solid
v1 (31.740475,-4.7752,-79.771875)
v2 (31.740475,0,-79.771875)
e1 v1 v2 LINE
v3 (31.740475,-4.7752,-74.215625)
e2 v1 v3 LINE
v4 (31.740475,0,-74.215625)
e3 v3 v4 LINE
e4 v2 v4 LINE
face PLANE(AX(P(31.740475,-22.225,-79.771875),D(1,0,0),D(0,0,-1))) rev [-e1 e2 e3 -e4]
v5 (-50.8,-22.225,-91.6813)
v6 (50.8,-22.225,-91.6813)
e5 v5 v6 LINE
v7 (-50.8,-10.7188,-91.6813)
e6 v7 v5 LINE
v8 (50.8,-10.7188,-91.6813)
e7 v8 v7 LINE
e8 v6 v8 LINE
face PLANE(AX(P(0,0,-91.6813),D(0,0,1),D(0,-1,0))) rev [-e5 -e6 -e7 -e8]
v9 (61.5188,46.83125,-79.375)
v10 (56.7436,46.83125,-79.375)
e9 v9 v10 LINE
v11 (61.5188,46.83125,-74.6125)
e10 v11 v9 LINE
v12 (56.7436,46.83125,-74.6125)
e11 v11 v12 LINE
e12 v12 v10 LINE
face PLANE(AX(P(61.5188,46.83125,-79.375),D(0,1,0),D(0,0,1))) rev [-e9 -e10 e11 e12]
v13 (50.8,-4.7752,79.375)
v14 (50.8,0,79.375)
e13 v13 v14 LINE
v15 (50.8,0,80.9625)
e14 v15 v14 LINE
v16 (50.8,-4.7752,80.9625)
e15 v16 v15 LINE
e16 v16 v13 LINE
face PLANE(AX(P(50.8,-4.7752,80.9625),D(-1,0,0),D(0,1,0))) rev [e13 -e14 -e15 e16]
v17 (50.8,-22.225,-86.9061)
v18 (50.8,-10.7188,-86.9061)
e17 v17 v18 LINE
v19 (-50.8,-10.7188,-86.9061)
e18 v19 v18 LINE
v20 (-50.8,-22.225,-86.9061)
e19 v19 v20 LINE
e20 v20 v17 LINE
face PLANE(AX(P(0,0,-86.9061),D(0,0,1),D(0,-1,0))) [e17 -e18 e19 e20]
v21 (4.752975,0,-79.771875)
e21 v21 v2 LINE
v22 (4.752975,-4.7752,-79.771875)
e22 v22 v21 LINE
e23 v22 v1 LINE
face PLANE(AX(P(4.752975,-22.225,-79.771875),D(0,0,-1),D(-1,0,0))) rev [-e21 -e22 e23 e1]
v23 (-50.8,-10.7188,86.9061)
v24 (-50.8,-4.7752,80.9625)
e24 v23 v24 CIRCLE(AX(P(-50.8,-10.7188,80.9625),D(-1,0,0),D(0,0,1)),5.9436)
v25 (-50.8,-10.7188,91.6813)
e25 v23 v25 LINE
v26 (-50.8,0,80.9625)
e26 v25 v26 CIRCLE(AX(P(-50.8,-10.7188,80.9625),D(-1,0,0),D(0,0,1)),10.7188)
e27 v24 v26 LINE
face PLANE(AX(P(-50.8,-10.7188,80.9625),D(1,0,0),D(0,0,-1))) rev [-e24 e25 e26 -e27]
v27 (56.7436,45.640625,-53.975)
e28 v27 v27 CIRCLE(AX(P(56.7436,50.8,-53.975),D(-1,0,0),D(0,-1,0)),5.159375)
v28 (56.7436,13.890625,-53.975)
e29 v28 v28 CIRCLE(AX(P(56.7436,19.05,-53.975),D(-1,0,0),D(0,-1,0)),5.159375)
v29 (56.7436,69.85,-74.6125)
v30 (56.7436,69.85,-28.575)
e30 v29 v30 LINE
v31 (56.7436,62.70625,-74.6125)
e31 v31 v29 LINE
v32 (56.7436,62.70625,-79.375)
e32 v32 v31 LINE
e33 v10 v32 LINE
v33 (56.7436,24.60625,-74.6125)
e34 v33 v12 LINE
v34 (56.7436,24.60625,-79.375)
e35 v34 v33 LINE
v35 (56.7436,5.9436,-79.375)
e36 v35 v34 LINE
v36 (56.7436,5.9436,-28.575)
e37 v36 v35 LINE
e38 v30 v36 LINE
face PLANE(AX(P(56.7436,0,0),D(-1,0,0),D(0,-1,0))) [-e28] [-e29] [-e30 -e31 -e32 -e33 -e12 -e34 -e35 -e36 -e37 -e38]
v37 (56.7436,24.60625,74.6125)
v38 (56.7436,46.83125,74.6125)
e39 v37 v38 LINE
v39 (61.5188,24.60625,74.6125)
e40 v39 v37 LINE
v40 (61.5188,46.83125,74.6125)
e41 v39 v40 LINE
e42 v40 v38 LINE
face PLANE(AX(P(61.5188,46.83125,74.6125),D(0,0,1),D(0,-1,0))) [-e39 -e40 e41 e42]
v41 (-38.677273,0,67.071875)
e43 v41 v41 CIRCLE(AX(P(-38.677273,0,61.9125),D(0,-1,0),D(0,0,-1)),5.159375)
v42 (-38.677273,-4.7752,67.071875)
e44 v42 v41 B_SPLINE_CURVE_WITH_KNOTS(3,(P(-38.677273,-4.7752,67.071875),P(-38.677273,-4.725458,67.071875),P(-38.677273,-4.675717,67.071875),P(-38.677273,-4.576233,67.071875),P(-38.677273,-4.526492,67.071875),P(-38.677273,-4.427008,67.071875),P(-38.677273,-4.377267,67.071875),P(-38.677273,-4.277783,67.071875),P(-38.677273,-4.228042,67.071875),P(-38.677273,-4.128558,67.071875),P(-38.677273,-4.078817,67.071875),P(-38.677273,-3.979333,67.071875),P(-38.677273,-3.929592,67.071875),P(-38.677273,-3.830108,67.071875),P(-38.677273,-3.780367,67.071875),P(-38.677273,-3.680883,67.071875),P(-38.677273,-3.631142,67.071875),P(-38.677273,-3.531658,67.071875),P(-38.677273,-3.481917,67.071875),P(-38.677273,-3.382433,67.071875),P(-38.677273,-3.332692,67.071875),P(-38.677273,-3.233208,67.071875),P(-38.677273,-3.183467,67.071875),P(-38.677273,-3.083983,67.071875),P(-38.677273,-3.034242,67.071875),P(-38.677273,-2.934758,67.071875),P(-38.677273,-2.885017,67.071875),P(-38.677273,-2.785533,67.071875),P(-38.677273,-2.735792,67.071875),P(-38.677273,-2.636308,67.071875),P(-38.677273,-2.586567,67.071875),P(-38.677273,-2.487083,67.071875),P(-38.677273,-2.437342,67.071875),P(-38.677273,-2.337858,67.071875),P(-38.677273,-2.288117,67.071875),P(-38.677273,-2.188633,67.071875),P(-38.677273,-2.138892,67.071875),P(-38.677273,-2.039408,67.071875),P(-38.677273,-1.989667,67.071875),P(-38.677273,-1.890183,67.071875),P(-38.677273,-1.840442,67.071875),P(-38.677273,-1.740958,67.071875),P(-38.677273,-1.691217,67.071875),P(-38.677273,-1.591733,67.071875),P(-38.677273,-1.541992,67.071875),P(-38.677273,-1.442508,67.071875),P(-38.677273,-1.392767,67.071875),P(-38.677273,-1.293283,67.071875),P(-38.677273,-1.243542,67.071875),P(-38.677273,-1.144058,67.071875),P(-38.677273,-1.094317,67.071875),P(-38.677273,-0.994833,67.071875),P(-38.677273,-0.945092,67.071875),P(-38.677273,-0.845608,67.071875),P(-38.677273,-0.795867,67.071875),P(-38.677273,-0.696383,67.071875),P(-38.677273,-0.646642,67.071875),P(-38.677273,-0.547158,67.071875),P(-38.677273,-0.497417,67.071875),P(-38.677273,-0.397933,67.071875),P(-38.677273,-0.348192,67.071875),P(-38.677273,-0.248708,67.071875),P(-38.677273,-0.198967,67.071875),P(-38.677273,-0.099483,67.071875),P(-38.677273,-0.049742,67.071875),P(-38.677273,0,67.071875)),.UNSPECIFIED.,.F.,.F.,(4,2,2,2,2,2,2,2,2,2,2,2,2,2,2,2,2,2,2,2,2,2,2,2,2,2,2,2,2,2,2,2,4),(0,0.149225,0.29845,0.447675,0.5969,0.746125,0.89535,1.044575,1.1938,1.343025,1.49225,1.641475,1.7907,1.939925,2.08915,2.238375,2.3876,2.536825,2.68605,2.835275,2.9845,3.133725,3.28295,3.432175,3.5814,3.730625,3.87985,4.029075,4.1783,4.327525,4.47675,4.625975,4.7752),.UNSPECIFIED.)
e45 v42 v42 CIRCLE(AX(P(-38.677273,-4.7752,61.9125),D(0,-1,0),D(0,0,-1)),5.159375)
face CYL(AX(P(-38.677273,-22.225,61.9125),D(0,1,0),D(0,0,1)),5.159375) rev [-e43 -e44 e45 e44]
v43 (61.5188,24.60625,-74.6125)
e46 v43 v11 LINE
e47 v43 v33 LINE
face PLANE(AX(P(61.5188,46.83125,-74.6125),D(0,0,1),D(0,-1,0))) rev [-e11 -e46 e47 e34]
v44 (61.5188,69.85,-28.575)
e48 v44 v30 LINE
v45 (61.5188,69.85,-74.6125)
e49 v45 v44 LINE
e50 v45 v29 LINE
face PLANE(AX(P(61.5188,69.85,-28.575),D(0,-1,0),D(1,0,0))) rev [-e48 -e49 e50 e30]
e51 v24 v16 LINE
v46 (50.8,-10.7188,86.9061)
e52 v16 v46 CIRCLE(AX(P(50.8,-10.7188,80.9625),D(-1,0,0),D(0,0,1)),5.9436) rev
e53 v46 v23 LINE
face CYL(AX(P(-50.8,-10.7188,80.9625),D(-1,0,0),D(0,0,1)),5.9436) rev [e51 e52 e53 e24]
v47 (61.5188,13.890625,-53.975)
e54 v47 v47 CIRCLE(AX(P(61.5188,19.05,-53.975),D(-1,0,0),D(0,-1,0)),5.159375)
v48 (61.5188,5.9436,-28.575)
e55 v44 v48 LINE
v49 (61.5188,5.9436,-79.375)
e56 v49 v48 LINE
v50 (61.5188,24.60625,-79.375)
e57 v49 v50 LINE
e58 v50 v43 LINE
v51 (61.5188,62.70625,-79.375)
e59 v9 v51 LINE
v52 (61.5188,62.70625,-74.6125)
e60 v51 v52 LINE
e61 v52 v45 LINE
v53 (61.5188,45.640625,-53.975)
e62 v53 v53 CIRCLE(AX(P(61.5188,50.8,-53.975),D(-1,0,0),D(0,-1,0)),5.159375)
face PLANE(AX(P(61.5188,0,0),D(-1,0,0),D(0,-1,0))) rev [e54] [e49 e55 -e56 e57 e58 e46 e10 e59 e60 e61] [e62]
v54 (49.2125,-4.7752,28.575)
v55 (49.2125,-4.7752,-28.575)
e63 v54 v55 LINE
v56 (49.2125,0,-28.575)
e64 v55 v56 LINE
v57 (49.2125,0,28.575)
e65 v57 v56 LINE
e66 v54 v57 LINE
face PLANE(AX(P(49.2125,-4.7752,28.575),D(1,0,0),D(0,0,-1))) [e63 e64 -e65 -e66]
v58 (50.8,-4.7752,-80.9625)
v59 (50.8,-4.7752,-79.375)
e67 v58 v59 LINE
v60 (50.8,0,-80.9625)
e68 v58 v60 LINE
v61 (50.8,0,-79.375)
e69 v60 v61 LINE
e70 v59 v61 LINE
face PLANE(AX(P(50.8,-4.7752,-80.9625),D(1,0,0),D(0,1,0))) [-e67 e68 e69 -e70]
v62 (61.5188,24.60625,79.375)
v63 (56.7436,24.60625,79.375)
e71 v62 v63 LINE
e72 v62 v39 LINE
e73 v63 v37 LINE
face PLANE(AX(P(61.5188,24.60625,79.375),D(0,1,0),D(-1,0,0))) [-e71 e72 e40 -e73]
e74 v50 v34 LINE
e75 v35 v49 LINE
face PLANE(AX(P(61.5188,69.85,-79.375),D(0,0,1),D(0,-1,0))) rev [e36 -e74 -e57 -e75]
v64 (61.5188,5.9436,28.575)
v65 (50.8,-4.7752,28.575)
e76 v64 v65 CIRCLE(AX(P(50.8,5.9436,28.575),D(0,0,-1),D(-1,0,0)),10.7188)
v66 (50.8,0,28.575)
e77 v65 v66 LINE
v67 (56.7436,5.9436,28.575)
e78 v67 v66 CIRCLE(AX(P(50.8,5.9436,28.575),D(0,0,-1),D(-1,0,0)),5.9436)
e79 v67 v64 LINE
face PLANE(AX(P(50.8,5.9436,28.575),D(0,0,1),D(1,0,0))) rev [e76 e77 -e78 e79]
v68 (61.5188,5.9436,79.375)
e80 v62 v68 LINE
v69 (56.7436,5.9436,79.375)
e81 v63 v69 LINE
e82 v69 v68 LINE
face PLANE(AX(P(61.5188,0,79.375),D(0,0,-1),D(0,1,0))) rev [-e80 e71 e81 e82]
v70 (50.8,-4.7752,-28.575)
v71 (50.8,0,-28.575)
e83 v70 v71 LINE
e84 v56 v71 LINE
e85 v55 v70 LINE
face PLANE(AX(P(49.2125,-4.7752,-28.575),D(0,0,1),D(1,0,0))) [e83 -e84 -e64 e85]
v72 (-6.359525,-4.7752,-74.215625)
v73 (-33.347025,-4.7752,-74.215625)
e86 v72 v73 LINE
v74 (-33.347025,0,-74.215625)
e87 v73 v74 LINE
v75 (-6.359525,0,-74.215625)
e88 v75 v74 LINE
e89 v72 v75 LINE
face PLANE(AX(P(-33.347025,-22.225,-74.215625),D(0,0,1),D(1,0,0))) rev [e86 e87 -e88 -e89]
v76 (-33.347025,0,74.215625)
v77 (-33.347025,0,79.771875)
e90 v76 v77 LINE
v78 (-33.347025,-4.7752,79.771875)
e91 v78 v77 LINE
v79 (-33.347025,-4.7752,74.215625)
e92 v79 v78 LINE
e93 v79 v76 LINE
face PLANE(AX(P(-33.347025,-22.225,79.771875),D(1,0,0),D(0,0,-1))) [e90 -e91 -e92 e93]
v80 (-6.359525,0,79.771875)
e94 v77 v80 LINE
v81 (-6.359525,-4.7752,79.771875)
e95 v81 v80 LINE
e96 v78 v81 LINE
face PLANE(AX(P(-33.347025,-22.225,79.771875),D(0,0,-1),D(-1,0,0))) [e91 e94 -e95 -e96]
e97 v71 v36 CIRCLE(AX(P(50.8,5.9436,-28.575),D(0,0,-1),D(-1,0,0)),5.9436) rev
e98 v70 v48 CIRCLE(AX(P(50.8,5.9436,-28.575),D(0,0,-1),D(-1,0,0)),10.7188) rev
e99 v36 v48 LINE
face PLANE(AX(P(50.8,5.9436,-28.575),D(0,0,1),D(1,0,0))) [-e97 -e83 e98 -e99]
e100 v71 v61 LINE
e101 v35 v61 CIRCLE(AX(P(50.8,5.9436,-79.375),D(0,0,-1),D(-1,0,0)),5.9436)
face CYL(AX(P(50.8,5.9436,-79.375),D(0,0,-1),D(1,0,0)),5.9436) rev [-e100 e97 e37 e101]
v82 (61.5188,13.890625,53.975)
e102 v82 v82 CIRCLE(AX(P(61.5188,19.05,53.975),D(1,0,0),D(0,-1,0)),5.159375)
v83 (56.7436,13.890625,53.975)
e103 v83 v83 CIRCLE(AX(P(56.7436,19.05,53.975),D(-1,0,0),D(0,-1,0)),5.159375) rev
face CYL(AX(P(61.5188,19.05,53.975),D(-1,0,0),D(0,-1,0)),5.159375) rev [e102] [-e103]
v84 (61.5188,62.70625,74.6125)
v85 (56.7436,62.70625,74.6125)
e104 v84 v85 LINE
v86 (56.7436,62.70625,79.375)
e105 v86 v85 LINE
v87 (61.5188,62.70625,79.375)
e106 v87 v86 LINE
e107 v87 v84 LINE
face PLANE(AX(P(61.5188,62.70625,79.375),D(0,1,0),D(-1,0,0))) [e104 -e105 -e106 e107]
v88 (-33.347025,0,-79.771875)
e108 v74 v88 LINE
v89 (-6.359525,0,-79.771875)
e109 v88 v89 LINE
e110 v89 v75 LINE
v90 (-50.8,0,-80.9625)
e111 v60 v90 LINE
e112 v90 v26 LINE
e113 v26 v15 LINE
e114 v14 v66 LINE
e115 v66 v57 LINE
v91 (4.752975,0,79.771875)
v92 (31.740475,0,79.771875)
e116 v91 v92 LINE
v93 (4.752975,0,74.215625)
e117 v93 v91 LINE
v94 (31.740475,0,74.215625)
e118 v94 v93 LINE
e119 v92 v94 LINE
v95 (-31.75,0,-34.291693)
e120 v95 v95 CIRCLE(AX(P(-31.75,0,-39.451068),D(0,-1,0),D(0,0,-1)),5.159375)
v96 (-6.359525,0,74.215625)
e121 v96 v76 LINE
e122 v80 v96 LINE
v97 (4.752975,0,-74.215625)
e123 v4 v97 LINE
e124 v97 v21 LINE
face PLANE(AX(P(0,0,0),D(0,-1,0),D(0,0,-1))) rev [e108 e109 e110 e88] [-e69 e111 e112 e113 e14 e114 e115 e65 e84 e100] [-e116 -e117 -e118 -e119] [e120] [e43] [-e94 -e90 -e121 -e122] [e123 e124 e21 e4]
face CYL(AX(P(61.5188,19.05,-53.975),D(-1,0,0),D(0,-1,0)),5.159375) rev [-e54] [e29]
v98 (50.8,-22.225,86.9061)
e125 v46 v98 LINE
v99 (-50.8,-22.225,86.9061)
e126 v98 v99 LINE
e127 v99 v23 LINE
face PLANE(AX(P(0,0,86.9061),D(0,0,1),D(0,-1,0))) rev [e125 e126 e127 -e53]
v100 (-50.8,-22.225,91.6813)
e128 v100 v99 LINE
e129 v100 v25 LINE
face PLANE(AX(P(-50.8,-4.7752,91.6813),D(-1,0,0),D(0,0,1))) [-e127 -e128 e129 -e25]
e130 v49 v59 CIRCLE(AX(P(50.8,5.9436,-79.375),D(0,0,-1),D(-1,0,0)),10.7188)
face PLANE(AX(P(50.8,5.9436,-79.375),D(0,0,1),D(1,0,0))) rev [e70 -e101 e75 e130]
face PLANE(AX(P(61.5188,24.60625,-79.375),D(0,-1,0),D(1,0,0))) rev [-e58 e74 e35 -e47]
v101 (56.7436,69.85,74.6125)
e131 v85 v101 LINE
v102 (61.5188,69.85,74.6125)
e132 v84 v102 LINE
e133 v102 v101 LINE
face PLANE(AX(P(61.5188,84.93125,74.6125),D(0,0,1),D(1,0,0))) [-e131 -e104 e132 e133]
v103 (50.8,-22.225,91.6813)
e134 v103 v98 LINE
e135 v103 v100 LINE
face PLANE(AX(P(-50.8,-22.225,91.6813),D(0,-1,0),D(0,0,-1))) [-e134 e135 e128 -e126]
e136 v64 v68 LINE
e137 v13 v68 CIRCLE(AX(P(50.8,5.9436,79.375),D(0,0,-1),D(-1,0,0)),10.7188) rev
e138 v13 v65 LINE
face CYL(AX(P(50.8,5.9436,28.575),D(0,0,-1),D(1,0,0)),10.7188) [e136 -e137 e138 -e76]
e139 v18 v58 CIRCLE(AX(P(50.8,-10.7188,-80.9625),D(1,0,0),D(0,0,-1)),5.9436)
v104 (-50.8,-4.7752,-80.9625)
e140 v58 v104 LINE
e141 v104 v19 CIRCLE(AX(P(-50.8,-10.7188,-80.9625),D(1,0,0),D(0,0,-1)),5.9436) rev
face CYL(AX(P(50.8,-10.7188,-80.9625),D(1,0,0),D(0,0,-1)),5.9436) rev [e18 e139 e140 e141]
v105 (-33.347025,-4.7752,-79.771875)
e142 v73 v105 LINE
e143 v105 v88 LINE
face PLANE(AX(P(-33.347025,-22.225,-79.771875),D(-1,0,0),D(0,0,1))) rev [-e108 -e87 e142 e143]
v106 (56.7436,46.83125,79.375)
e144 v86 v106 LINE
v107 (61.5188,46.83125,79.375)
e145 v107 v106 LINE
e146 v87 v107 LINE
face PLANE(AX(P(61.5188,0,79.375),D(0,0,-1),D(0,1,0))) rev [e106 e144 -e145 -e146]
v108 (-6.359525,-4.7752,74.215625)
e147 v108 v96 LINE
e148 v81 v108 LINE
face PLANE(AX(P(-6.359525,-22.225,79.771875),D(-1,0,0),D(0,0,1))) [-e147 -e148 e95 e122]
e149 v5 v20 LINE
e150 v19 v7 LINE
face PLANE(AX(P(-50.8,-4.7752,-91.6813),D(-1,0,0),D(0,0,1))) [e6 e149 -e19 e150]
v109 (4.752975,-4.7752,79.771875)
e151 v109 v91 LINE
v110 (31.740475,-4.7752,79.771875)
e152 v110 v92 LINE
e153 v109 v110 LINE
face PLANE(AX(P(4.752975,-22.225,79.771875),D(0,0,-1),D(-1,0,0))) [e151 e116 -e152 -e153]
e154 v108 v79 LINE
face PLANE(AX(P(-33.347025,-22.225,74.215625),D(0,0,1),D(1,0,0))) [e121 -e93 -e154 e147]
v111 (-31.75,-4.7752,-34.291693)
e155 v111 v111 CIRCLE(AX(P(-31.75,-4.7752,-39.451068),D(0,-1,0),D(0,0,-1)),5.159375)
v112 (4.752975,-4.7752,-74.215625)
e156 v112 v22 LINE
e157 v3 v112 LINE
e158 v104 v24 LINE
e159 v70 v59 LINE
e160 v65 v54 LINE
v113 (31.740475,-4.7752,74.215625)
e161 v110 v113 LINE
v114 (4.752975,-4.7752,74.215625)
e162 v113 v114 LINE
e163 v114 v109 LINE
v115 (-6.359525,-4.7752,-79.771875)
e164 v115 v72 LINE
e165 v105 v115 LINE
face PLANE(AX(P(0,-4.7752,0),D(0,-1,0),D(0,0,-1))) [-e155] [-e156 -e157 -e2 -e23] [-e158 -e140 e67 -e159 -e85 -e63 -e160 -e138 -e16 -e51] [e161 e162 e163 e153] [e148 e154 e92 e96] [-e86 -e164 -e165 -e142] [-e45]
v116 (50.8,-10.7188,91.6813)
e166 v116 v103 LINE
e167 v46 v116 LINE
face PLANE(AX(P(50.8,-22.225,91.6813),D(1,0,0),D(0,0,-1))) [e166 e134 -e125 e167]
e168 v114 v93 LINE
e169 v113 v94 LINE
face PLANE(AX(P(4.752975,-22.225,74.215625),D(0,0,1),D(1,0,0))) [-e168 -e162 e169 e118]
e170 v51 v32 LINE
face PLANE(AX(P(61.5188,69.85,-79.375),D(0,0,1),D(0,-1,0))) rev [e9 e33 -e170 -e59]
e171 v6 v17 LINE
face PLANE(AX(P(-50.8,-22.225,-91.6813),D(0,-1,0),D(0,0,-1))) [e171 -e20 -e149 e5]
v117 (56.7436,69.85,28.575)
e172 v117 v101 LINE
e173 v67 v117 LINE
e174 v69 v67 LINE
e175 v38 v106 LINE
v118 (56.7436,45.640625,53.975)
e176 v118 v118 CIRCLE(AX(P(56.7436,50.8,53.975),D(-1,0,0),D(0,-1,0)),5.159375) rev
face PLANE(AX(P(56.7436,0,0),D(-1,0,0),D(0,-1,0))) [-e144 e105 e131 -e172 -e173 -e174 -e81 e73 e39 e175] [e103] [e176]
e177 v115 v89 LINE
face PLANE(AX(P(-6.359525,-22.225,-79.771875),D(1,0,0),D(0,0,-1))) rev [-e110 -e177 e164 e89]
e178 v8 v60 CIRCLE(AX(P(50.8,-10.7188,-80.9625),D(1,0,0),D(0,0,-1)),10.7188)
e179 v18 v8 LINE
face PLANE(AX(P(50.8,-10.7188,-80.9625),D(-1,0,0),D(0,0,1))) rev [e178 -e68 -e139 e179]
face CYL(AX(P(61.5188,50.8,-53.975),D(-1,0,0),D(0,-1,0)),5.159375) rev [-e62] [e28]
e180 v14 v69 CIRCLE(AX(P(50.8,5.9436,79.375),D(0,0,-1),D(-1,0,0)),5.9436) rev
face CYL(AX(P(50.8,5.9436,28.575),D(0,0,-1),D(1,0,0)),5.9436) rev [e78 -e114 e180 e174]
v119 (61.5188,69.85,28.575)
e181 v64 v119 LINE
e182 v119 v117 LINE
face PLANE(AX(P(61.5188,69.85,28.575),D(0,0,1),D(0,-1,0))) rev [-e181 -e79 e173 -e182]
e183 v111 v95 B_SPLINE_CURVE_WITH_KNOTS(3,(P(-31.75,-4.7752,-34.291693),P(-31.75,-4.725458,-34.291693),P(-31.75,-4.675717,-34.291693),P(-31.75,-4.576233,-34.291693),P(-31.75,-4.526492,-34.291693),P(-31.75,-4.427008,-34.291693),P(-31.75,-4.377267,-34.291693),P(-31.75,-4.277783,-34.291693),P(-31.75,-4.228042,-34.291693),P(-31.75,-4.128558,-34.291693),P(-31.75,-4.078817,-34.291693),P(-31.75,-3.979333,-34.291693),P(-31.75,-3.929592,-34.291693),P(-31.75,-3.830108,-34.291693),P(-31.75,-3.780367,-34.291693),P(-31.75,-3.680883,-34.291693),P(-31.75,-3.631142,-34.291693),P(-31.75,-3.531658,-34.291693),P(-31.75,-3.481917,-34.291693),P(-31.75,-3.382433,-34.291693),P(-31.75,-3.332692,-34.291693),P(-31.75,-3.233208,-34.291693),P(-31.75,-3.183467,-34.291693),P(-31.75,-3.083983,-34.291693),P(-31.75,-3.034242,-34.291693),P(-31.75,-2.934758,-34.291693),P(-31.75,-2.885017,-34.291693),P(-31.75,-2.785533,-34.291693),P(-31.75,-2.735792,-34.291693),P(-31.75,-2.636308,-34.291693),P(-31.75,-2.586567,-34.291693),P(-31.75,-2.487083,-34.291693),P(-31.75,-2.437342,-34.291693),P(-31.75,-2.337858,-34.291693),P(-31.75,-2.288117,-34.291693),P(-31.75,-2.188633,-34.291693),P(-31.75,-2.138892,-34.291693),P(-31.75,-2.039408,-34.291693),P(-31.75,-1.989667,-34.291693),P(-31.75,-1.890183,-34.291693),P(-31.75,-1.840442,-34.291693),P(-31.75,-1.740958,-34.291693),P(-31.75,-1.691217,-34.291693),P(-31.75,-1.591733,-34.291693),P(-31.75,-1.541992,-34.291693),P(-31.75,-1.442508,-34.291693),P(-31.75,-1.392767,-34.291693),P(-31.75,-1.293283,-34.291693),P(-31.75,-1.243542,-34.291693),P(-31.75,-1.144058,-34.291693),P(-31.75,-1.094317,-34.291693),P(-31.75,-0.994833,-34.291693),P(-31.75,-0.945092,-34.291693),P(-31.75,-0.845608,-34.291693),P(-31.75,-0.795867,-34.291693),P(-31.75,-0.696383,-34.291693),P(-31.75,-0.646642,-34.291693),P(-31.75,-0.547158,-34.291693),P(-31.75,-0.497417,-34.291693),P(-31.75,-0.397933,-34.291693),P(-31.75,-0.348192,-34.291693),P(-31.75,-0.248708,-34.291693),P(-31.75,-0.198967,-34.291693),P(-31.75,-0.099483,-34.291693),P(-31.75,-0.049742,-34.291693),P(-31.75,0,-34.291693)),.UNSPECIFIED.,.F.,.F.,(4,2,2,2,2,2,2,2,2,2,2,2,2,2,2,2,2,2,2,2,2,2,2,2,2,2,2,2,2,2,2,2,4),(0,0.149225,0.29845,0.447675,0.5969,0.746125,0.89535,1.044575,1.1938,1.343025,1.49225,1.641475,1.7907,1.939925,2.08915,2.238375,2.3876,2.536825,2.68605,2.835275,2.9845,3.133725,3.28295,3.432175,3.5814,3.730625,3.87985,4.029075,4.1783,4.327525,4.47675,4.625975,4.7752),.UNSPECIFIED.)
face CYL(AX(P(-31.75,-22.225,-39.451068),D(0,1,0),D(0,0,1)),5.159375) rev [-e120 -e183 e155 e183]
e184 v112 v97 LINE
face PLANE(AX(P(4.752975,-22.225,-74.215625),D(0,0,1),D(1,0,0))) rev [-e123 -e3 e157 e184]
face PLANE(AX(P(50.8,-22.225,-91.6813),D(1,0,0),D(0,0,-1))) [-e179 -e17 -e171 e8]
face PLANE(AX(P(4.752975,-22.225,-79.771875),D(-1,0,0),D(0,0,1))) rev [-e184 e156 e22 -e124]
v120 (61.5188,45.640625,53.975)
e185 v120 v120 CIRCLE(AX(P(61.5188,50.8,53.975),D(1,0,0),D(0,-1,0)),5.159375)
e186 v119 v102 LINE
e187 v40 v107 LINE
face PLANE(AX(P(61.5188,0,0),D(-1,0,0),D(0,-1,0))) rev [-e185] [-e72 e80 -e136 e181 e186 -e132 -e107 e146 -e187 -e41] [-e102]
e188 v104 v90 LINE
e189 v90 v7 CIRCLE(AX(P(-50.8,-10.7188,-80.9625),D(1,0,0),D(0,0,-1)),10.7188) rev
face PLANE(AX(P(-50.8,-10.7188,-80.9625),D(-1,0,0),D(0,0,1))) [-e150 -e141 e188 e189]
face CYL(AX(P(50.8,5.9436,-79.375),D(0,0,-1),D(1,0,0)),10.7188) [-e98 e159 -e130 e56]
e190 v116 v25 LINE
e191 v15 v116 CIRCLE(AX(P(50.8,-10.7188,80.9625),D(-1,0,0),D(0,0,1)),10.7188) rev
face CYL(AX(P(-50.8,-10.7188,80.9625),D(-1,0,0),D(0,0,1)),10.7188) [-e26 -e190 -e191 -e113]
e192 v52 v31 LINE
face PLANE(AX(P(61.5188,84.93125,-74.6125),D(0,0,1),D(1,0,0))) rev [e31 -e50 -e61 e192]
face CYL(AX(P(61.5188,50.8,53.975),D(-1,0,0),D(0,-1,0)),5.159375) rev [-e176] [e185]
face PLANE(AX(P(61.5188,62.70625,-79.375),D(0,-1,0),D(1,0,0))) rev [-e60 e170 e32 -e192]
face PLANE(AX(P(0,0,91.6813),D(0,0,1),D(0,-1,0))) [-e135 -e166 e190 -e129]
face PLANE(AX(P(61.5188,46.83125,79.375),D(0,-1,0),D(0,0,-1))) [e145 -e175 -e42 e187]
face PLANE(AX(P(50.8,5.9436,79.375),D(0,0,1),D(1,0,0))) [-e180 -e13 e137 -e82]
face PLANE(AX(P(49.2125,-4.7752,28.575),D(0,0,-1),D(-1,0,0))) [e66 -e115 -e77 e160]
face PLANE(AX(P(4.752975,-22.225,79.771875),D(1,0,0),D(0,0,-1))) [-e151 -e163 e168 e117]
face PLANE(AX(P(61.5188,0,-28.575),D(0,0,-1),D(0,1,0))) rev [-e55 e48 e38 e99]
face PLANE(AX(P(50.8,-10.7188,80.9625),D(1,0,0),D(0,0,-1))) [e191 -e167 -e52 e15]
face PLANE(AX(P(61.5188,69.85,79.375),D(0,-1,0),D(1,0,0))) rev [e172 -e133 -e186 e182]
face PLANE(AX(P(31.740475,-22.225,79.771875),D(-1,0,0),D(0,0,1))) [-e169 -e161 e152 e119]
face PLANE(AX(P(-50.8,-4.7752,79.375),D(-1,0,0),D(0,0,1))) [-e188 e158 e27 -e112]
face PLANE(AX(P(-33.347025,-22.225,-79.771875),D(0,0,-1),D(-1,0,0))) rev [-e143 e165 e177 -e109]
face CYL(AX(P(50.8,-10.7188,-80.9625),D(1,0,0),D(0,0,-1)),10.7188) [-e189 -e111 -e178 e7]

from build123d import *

# Parameters (mm, degrees)
BASE_FLANGE1_DEPTH      = 4.7752
EDGE_FLANGE1_DEPTH      = 50.8
EDGE_FLANGE1_BEND_DEPTH = 50.8
EDGE_FLANGE2_DEPTH      = 101.6
EDGE_FLANGE2_BEND_DEPTH = 101.6
SKETCH18_R              = 5.159375
SKETCH18_W              = 4.7625
SKETCH18_H              = 22.225
CUT_EXTRUDE1_DEPTH      = 158.639173972
SKETCH19_W              = 26.9875
SKETCH19_H              = 5.55625
CUT_EXTRUDE2_DEPTH      = 131.648559208
CUT_EXTRUDE3_DEPTH      = 131.648559208
CUT_EXTRUDE3_DEPTH_BACK = 131.648559208
SKETCH20_R              = 5.159375


# Sheet-metal steps are written as plain solids
with BuildPart() as part:
    # Sketch1 → Base-Flange1 (new body)
    with BuildSketch(Plane(origin=(0, 0, 0), x_dir=(1, 0, 0), z_dir=(0, 1, 0))):
        Polygon((49.2125, -28.575), (49.2125, 28.575), (50.8, 28.575), (50.8, 79.375), (-50.8, 79.375), (-50.8, -79.375), (50.8, -79.375), (50.8, -28.575), align=None)
    extrude(amount=-BASE_FLANGE1_DEPTH)

    # Edge-Flange1 section (across the edge) → Edge-Flange1 (add)
    with BuildSketch(Plane(origin=(56.7436, 0, -28.575), x_dir=(-1, 0, 0), z_dir=(0, 0, -1))):
        with BuildLine():
            Line((-4.7752, 5.9436), (-4.7752, 69.85))
            Line((-4.7752, 69.85), (0, 69.85))
            Line((0, 69.85), (0, 5.9436))
            ThreePointArc((0, 5.9436), (1.740840135, 1.740840135), (5.9436, 0))
            Line((5.9436, 0), (5.9436, -4.7752))
            ThreePointArc((5.9436, -4.7752), (-1.635736166, -1.635736166), (-4.7752, 5.9436))
        make_face()
    extrude(amount=EDGE_FLANGE1_DEPTH)

    # Edge-Flange1 section 2 (across the edge) → Edge-Flange1 bend (add)
    with BuildSketch(Plane(origin=(56.7436, 0, 79.375), x_dir=(-1, 0, 0), z_dir=(0, 0, -1))):
        with BuildLine():
            Line((-4.7752, 5.9436), (-4.7752, 69.85))
            Line((-4.7752, 69.85), (0, 69.85))
            Line((0, 69.85), (0, 5.9436))
            ThreePointArc((0, 5.9436), (1.740840135, 1.740840135), (5.9436, 0))
            Line((5.9436, 0), (5.9436, -4.7752))
            ThreePointArc((5.9436, -4.7752), (-1.635736166, -1.635736166), (-4.7752, 5.9436))
        make_face()
    extrude(amount=EDGE_FLANGE1_BEND_DEPTH)

    # Edge-Flange2 section (across the edge) → Edge-Flange2 (add)
    with BuildSketch(Plane(origin=(50.8, -4.7752, 86.9061), x_dir=(0, 0, -1), z_dir=(-1, 0, 0))):
        with BuildLine():
            Line((-4.7752, 5.9436), (-4.7752, 17.4498))
            Line((-4.7752, 17.4498), (0, 17.4498))
            Line((0, 17.4498), (0, 5.9436))
            ThreePointArc((0, 5.9436), (1.740840135, 1.740840135), (5.9436, 0))
            Line((5.9436, 0), (7.5311, 0))
            Line((7.5311, 0), (7.5311, -4.7752))
            Line((7.5311, -4.7752), (5.9436, -4.7752))
            ThreePointArc((5.9436, -4.7752), (-1.635736166, -1.635736166), (-4.7752, 5.9436))
        make_face()
    extrude(amount=EDGE_FLANGE2_DEPTH)

    # Edge-Flange2 section 2 (across the edge) → Edge-Flange2 bend (add)
    with BuildSketch(Plane(origin=(-50.8, -4.7752, -86.9061), x_dir=(0, 0, 1), z_dir=(1, 0, 0))):
        with BuildLine():
            Line((-4.7752, 5.9436), (-4.7752, 17.4498))
            Line((-4.7752, 17.4498), (0, 17.4498))
            Line((0, 17.4498), (0, 5.9436))
            ThreePointArc((0, 5.9436), (1.740840135, 1.740840135), (5.9436, 0))
            Line((5.9436, 0), (7.5311, 0))
            Line((7.5311, 0), (7.5311, -4.7752))
            Line((7.5311, -4.7752), (5.9436, -4.7752))
            ThreePointArc((5.9436, -4.7752), (-1.635736166, -1.635736166), (-4.7752, 5.9436))
        make_face()
    extrude(amount=EDGE_FLANGE2_BEND_DEPTH)

    # Sketch18 → Cut-Extrude1 (cut, symmetric)
    with BuildSketch(Plane.ZY.offset(-56.7436)):
        with Locations(Location((-53.975, 50.8, 0), (0, 0, 270))):
            Circle(SKETCH18_R)
        with Locations(Location((-53.975, 19.05, 0), (0, 0, 270))):
            Circle(SKETCH18_R)
        with Locations((-76.99375, 73.81875)):
            Rectangle(SKETCH18_W, SKETCH18_H)
        with Locations((-76.99375, 35.71875)):
            Rectangle(SKETCH18_W, SKETCH18_H)
    cut_extrude1 = extrude(amount=CUT_EXTRUDE1_DEPTH, both=True, mode=Mode.SUBTRACT)

    # Sketch19 → Cut-Extrude2 (cut, symmetric)
    with BuildSketch(Plane(origin=(0, 0, 0), x_dir=(1, 0, 0), z_dir=(0, 1, 0))):
        with Locations((-19.853275, 76.99375)):
            Rectangle(SKETCH19_W, SKETCH19_H)
        with Locations((18.246725, 76.99375)):
            Rectangle(SKETCH19_W, SKETCH19_H)
    cut_extrude2 = extrude(amount=CUT_EXTRUDE2_DEPTH, both=True, mode=Mode.SUBTRACT)

    # Sketch20 → Cut-Extrude3 (cut, two sides: drawn at the far end of the back side and taken through both)
    with BuildSketch(Plane(origin=(0, 0, 0), x_dir=(1, 0, 0), z_dir=(0, 1, 0)).offset(-CUT_EXTRUDE3_DEPTH_BACK)):
        with Locations((-101.437452915, 44.213567876)):
            Circle(SKETCH20_R)
        with Locations(Location((-31.75, 39.451067876, 0), (0, 0, 270))):
            Circle(SKETCH20_R)
        with Locations(Location((-38.677272727, -61.9125, 0), (0, 0, 270))):
            Circle(SKETCH20_R)
        with Locations((-108.364725642, -57.15)):
            Circle(SKETCH20_R)
    extrude(amount=CUT_EXTRUDE3_DEPTH + CUT_EXTRUDE3_DEPTH_BACK, mode=Mode.SUBTRACT)

    # Mirror1: Cut-Extrude1, Cut-Extrude2 across plane
    add(cut_extrude1.mirror(Plane.XY), mode=Mode.SUBTRACT)
    add(cut_extrude2.mirror(Plane.XY), mode=Mode.SUBTRACT)


solid = part.part
